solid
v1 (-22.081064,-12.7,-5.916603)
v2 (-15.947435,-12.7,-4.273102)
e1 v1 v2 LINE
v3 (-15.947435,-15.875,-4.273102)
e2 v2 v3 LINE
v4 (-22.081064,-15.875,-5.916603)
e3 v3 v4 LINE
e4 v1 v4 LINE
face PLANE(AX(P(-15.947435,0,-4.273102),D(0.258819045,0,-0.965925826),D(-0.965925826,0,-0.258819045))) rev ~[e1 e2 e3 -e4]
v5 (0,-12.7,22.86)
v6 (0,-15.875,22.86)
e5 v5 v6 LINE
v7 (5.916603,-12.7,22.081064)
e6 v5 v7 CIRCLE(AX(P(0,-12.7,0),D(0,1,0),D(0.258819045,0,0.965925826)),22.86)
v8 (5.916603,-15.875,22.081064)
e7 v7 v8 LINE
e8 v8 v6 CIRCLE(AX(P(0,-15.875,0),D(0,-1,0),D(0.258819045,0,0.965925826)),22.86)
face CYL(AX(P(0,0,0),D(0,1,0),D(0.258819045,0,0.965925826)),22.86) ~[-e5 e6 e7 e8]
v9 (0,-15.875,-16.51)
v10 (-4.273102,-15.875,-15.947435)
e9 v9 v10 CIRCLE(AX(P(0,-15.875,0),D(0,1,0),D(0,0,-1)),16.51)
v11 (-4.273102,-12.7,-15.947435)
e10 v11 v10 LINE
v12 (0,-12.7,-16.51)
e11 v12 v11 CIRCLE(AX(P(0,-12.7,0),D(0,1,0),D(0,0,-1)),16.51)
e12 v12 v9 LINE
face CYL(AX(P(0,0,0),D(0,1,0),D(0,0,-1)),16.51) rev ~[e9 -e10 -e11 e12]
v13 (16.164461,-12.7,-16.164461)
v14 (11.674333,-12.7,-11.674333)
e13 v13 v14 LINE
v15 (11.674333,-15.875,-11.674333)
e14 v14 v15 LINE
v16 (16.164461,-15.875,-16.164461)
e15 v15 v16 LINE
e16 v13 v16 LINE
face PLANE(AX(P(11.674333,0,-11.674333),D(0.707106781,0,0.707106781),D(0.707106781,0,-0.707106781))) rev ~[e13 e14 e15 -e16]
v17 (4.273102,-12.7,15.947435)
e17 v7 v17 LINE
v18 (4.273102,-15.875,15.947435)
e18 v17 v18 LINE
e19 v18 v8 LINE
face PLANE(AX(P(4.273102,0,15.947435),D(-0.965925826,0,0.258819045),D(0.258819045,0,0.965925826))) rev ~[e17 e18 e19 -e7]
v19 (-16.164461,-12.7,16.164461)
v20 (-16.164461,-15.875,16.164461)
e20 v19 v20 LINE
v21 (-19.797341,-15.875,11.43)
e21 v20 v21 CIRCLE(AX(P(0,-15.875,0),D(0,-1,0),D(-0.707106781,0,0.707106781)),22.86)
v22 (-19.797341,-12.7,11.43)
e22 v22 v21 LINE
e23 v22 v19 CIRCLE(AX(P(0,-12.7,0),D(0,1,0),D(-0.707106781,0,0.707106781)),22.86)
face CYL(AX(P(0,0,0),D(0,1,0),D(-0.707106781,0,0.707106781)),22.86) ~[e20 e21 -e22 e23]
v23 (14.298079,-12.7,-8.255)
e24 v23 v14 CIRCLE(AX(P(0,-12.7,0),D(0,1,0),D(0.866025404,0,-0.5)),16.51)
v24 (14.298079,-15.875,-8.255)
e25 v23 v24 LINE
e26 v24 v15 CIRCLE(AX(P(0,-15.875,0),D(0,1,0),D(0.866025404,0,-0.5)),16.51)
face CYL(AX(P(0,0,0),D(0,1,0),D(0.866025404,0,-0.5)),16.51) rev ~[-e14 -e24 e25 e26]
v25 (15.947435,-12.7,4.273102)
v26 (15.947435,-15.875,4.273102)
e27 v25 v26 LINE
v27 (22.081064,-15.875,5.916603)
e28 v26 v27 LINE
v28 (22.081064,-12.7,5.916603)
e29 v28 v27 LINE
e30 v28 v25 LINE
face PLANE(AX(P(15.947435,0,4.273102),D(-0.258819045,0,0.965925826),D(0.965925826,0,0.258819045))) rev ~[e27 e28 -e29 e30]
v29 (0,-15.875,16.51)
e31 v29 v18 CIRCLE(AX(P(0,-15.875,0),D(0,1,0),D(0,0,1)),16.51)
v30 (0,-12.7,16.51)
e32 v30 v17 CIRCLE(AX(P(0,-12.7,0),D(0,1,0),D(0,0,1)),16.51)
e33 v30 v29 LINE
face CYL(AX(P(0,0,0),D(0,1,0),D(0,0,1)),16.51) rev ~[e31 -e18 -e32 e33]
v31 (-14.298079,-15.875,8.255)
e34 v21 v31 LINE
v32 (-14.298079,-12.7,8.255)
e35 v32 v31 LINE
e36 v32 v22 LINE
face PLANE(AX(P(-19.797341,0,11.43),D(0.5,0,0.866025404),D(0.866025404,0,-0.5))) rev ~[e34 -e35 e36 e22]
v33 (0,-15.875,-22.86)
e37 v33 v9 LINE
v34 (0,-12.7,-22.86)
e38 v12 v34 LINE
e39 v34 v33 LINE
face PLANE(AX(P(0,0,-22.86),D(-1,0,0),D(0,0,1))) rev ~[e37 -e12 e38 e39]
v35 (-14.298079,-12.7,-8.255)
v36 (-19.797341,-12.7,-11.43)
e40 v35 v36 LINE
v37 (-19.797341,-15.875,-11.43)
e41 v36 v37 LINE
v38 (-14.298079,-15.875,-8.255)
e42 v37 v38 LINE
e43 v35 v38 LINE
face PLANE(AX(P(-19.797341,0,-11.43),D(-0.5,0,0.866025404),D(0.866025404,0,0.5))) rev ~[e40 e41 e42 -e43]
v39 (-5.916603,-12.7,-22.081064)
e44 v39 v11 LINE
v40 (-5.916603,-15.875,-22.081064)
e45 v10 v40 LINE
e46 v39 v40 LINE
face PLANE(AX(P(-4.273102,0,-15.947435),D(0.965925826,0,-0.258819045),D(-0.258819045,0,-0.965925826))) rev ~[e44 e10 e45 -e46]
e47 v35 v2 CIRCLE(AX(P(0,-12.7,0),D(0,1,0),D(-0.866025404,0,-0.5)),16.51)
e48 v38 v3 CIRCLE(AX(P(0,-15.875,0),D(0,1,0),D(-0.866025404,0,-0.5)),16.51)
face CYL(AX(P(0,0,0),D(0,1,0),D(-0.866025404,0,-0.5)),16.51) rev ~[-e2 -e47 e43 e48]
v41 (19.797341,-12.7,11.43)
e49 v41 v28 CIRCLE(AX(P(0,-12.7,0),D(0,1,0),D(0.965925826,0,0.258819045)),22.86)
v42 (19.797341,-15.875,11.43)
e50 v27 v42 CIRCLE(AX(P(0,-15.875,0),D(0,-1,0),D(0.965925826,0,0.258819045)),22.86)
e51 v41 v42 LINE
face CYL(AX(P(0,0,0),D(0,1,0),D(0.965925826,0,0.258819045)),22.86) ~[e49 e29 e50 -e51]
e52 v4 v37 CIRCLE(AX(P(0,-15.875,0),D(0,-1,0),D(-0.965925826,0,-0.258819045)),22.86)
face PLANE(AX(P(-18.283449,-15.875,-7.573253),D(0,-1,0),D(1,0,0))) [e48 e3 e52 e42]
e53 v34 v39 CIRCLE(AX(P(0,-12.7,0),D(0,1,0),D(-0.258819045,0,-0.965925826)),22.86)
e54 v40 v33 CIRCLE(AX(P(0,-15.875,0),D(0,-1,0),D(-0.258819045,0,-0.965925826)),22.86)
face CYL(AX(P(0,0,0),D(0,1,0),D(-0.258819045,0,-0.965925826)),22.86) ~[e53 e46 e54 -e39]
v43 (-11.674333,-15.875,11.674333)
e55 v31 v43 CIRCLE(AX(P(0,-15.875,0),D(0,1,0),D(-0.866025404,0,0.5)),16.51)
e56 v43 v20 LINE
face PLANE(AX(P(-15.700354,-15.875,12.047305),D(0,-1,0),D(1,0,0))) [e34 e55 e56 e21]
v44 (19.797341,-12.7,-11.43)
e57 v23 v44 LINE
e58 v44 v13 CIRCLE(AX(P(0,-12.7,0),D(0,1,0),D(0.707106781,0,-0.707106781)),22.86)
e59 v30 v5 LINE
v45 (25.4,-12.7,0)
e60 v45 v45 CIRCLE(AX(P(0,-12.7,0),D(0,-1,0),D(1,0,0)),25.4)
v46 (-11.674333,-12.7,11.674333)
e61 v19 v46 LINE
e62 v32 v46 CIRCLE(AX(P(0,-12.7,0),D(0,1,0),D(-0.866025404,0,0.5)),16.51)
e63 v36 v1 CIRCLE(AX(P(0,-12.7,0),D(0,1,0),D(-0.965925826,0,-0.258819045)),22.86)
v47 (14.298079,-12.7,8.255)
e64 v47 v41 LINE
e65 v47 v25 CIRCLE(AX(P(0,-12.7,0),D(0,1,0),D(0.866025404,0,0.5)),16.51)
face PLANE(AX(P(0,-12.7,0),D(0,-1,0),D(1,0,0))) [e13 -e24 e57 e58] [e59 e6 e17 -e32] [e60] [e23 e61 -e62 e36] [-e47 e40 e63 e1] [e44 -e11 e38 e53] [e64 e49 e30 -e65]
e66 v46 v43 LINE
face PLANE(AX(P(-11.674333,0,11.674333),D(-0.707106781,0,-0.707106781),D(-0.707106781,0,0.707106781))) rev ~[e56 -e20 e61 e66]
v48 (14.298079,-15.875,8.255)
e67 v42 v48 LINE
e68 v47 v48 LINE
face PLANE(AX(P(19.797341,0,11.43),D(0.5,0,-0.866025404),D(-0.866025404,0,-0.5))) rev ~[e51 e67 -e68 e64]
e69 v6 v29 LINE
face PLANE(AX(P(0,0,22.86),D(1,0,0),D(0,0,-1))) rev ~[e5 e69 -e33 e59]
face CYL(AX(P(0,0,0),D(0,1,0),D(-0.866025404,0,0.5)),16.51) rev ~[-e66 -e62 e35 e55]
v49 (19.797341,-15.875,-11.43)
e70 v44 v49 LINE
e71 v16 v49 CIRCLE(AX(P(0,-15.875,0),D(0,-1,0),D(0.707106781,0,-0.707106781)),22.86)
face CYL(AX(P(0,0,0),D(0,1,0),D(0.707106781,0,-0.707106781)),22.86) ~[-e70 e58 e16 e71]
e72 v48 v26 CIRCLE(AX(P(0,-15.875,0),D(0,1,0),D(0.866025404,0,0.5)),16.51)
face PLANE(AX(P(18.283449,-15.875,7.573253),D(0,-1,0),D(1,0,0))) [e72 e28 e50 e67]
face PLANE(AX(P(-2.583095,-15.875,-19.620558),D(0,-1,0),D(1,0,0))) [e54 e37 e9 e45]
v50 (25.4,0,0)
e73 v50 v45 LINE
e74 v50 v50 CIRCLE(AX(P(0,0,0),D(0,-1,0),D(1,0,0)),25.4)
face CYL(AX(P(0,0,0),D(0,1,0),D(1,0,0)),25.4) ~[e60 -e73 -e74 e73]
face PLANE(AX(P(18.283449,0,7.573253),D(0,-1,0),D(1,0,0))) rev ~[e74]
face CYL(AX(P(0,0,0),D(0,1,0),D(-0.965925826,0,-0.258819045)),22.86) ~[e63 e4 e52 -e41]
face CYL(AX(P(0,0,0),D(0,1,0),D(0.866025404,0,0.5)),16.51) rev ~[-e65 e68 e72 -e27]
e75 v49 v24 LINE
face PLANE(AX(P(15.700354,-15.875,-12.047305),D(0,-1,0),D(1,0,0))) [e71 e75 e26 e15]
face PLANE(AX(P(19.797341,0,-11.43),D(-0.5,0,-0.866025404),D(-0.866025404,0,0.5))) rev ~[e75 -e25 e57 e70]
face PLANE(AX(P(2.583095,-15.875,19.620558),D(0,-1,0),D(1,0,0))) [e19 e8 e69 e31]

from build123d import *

# Parameters (mm, degrees)
F0_R     = 25.4
F1_DEPTH = 12.7
F2_DEPTH = 15.875


# Not quite as in the source:
# - a length typed as a fraction of an inch, garbled in the dataset ("3 / 203.2 mm" for 3/8 in), is restored
# - a feature names something its author has since deleted; it is built from what else it names


with BuildPart() as f1:
    # F0 (on Front) → F1 (new body)
    with BuildSketch(Plane.XZ):
        Circle(F0_R)
        with BuildLine():
            Line((0, -16.51), (0, -22.86))
            ThreePointArc((0, -22.86), (-2.9838287542, -22.664429531), (-5.916603371, -22.081064389))
            Line((-5.916603371, -22.081064389), (-4.2731024346, -15.947435392))
            ThreePointArc((-4.2731024346, -15.947435392), (-2.1549874336, -16.3687546613), (0, -16.51))
        make_face(mode=Mode.SUBTRACT)
        with BuildLine():
            Line((-14.2980794165, -8.255), (-19.7973407305, -11.43))
            ThreePointArc((-19.7973407305, -11.43), (-21.1198861132, -8.7481432639), (-22.081064389, -5.916603371))
            Line((-22.081064389, -5.916603371), (-15.947435392, -4.2731024346))
            ThreePointArc((-15.947435392, -4.2731024346), (-15.2532510818, -6.3181034683), (-14.2980794165, -8.255))
        make_face(mode=Mode.SUBTRACT)
        with BuildLine():
            Line((14.2980794165, -8.255), (19.7973407305, -11.43))
            ThreePointArc((19.7973407305, -11.43), (18.1360573591, -13.9162862671), (16.1644610179, -16.1644610179))
            Line((16.1644610179, -16.1644610179), (11.6743329574, -11.6743329574))
            ThreePointArc((11.6743329574, -11.6743329574), (13.0982636482, -10.0506511929), (14.2980794165, -8.255))
        make_face(mode=Mode.SUBTRACT)
        with BuildLine():
            Line((-14.2980794165, 8.255), (-19.7973407305, 11.43))
            ThreePointArc((-19.7973407305, 11.43), (-18.1360573591, 13.9162862671), (-16.1644610179, 16.1644610179))
            Line((-16.1644610179, 16.1644610179), (-11.6743329574, 11.6743329574))
            ThreePointArc((-11.6743329574, 11.6743329574), (-13.0982636482, 10.0506511929), (-14.2980794165, 8.255))
        make_face(mode=Mode.SUBTRACT)
        with BuildLine():
            Line((14.2980794165, 8.255), (19.7973407305, 11.43))
            ThreePointArc((19.7973407305, 11.43), (21.1198861132, 8.7481432639), (22.081064389, 5.916603371))
            Line((22.081064389, 5.916603371), (15.947435392, 4.2731024346))
            ThreePointArc((15.947435392, 4.2731024346), (15.2532510818, 6.3181034683), (14.2980794165, 8.255))
        make_face(mode=Mode.SUBTRACT)
        with BuildLine():
            Line((0, 16.51), (0, 22.86))
            ThreePointArc((0, 22.86), (2.9838287542, 22.664429531), (5.916603371, 22.081064389))
            Line((5.916603371, 22.081064389), (4.2731024346, 15.947435392))
            ThreePointArc((4.2731024346, 15.947435392), (2.1549874336, 16.3687546613), (0, 16.51))
        make_face(mode=Mode.SUBTRACT)
        with BuildLine():
            ThreePointArc((5.916603371, 22.081064389), (2.9838287542, 22.664429531), (0, 22.86))
            Line((0, 22.86), (0, 16.51))
            ThreePointArc((0, 16.51), (2.1549874336, 16.3687546613), (4.2731024346, 15.947435392))
            Line((4.2731024346, 15.947435392), (5.916603371, 22.081064389))
        make_face()
        with BuildLine():
            ThreePointArc((-16.1644610179, 16.1644610179), (-18.1360573591, 13.9162862671), (-19.7973407305, 11.43))
            Line((-19.7973407305, 11.43), (-14.2980794165, 8.255))
            ThreePointArc((-14.2980794165, 8.255), (-13.0982636482, 10.0506511929), (-11.6743329574, 11.6743329574))
            Line((-11.6743329574, 11.6743329574), (-16.1644610179, 16.1644610179))
        make_face()
        with BuildLine():
            ThreePointArc((-22.081064389, -5.916603371), (-21.1198861132, -8.7481432639), (-19.7973407305, -11.43))
            Line((-19.7973407305, -11.43), (-14.2980794165, -8.255))
            ThreePointArc((-14.2980794165, -8.255), (-15.2532510818, -6.3181034683), (-15.947435392, -4.2731024346))
            Line((-15.947435392, -4.2731024346), (-22.081064389, -5.916603371))
        make_face()
        with BuildLine():
            ThreePointArc((16.1644610179, -16.1644610179), (18.1360573591, -13.9162862671), (19.7973407305, -11.43))
            Line((19.7973407305, -11.43), (14.2980794165, -8.255))
            ThreePointArc((14.2980794165, -8.255), (13.0982636482, -10.0506511929), (11.6743329574, -11.6743329574))
            Line((11.6743329574, -11.6743329574), (16.1644610179, -16.1644610179))
        make_face()
        with BuildLine():
            ThreePointArc((22.081064389, 5.916603371), (21.1198861132, 8.7481432639), (19.7973407305, 11.43))
            Line((19.7973407305, 11.43), (14.2980794165, 8.255))
            ThreePointArc((14.2980794165, 8.255), (15.2532510818, 6.3181034683), (15.947435392, 4.2731024346))
            Line((15.947435392, 4.2731024346), (22.081064389, 5.916603371))
        make_face()
        with BuildLine():
            ThreePointArc((-5.916603371, -22.081064389), (-2.9838287542, -22.664429531), (0, -22.86))
            Line((0, -22.86), (0, -16.51))
            ThreePointArc((0, -16.51), (-2.1549874336, -16.3687546613), (-4.2731024346, -15.947435392))
            Line((-4.2731024346, -15.947435392), (-5.916603371, -22.081064389))
        make_face()
    extrude(amount=F1_DEPTH)

    # F0 (on Front) → F2 (join)
    with BuildSketch(Plane.XZ):
        with BuildLine():
            ThreePointArc((22.081064389, 5.916603371), (21.1198861132, 8.7481432639), (19.7973407305, 11.43))
            Line((19.7973407305, 11.43), (14.2980794165, 8.255))
            ThreePointArc((14.2980794165, 8.255), (15.2532510818, 6.3181034683), (15.947435392, 4.2731024346))
            Line((15.947435392, 4.2731024346), (22.081064389, 5.916603371))
        make_face()
        with BuildLine():
            ThreePointArc((16.1644610179, -16.1644610179), (18.1360573591, -13.9162862671), (19.7973407305, -11.43))
            Line((19.7973407305, -11.43), (14.2980794165, -8.255))
            ThreePointArc((14.2980794165, -8.255), (13.0982636482, -10.0506511929), (11.6743329574, -11.6743329574))
            Line((11.6743329574, -11.6743329574), (16.1644610179, -16.1644610179))
        make_face()
        with BuildLine():
            ThreePointArc((-5.916603371, -22.081064389), (-2.9838287542, -22.664429531), (0, -22.86))
            Line((0, -22.86), (0, -16.51))
            ThreePointArc((0, -16.51), (-2.1549874336, -16.3687546613), (-4.2731024346, -15.947435392))
            Line((-4.2731024346, -15.947435392), (-5.916603371, -22.081064389))
        make_face()
        with BuildLine():
            ThreePointArc((-16.1644610179, 16.1644610179), (-18.1360573591, 13.9162862671), (-19.7973407305, 11.43))
            Line((-19.7973407305, 11.43), (-14.2980794165, 8.255))
            ThreePointArc((-14.2980794165, 8.255), (-13.0982636482, 10.0506511929), (-11.6743329574, 11.6743329574))
            Line((-11.6743329574, 11.6743329574), (-16.1644610179, 16.1644610179))
        make_face()
        with BuildLine():
            ThreePointArc((5.916603371, 22.081064389), (2.9838287542, 22.664429531), (0, 22.86))
            Line((0, 22.86), (0, 16.51))
            ThreePointArc((0, 16.51), (2.1549874336, 16.3687546613), (4.2731024346, 15.947435392))
            Line((4.2731024346, 15.947435392), (5.916603371, 22.081064389))
        make_face()
        with BuildLine():
            ThreePointArc((-22.081064389, -5.916603371), (-21.1198861132, -8.7481432639), (-19.7973407305, -11.43))
            Line((-19.7973407305, -11.43), (-14.2980794165, -8.255))
            ThreePointArc((-14.2980794165, -8.255), (-15.2532510818, -6.3181034683), (-15.947435392, -4.2731024346))
            Line((-15.947435392, -4.2731024346), (-22.081064389, -5.916603371))
        make_face()
    extrude(amount=F2_DEPTH)


solid = f1.part
